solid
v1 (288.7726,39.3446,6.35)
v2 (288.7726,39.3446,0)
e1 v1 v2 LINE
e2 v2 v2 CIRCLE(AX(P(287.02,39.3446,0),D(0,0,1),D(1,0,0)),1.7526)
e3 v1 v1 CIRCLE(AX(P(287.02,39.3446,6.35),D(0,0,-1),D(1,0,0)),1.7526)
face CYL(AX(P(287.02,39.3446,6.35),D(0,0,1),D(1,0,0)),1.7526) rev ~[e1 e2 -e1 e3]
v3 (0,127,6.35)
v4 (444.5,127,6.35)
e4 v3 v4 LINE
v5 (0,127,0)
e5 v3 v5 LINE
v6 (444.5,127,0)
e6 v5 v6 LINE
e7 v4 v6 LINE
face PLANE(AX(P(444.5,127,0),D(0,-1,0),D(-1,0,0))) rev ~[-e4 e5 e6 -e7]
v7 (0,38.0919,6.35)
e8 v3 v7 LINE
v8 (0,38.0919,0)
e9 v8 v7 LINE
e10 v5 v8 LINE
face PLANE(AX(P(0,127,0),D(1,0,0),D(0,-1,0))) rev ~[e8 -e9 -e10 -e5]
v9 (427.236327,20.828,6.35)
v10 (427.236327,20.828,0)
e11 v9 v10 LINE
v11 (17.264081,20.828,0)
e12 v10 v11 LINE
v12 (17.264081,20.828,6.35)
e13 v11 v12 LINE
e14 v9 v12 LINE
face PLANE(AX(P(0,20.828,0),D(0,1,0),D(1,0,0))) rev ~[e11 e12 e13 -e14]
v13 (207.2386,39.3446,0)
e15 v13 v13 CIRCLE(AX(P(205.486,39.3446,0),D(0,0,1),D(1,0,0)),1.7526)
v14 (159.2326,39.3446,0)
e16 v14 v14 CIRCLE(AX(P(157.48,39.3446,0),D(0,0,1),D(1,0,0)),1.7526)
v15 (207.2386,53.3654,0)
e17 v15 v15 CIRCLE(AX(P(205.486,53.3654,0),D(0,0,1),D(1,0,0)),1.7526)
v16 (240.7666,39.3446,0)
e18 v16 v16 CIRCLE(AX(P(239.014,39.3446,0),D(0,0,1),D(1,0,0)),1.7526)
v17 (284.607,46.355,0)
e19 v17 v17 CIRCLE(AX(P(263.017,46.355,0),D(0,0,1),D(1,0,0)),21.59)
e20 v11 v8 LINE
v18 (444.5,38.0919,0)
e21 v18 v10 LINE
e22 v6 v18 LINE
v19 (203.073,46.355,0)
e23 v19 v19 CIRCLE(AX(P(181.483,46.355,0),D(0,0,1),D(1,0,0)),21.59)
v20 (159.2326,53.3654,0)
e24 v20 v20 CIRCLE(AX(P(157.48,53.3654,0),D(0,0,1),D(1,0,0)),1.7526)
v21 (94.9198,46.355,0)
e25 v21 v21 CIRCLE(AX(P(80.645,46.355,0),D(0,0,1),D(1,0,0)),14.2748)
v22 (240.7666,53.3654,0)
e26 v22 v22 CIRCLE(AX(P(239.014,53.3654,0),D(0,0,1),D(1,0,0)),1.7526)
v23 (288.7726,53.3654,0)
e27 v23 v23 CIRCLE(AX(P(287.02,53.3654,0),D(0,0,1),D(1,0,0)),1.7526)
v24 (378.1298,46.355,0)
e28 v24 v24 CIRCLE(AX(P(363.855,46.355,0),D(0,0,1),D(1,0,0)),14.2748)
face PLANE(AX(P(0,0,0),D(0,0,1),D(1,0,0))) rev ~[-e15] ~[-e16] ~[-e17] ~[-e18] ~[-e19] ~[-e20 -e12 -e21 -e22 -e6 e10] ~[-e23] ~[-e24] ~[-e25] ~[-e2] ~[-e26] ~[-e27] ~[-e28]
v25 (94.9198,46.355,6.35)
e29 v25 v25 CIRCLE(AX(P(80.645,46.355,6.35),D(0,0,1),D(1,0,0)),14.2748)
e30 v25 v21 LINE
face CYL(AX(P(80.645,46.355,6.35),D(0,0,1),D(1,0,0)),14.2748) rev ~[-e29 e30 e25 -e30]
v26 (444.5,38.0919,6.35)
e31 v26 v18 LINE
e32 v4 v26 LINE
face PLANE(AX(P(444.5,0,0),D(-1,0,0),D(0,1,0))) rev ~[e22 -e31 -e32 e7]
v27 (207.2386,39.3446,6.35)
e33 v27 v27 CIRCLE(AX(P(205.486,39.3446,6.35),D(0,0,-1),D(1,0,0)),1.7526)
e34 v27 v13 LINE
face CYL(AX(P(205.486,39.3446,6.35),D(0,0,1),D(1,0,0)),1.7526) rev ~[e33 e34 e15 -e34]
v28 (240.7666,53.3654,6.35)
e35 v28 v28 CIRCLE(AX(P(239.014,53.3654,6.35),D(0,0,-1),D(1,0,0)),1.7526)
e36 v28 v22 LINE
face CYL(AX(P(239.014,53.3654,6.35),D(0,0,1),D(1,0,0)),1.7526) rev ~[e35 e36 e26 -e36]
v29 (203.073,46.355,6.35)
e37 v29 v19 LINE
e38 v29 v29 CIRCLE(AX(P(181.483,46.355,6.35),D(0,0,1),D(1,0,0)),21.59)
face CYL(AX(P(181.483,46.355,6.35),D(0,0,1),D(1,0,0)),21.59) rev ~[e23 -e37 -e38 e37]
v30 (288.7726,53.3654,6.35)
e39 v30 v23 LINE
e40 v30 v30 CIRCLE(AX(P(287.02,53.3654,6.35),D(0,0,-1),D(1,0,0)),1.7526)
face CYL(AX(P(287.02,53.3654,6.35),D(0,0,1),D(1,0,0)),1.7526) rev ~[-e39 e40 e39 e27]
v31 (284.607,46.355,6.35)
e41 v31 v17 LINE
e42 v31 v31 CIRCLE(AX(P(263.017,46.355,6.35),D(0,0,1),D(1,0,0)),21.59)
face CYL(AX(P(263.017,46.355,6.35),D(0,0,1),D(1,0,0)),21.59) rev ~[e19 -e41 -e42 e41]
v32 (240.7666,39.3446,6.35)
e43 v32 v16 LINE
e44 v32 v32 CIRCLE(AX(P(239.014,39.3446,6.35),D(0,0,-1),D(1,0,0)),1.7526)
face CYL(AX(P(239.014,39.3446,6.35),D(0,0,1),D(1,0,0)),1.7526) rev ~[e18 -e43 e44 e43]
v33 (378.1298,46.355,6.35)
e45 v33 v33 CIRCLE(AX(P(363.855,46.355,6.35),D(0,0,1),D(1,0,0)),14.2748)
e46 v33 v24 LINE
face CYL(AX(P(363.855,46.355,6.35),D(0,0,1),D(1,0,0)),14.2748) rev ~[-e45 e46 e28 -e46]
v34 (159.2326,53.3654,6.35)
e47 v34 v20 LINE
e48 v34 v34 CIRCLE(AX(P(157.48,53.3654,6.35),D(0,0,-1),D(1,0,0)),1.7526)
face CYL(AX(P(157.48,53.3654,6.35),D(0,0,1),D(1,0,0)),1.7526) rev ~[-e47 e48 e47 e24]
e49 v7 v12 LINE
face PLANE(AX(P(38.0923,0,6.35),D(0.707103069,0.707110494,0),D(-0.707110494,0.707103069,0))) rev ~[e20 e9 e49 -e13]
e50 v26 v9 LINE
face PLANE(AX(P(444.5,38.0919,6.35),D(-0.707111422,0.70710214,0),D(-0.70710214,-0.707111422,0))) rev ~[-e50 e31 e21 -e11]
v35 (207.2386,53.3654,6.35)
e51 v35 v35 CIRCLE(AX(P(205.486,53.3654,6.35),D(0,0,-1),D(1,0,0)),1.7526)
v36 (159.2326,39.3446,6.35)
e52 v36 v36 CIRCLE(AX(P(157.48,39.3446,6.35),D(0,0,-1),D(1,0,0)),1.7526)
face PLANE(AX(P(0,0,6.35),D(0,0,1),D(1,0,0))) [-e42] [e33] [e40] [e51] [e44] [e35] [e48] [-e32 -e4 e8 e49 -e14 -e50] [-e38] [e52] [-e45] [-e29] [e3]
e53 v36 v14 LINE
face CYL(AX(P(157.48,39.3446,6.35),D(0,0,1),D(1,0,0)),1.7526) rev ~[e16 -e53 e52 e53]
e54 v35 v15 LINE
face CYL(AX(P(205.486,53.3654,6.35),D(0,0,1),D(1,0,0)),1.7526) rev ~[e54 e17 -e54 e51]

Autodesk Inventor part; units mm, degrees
ref_plane "YZ Plane" through (0, 0, 0) normal (1, 0, 0) x (0, 1, 0)
ref_plane "XZ Plane" through (0, 0, 0) normal (0, 1, 0) x (-1, 0, 0)
ref_plane "XY Plane" through (0, 0, 0) normal (0, 0, 1) x (1, 0, 0)
sketch "Sketch1" plane through (0, 0, 0) normal (0, 0, 1) x (1, 0, 0)
  line L0 (0, 0) -> (444.5, 0)
  line L1 (444.5, 0) -> (444.5, 127)
  line L2 (444.5, 127) -> (0, 127)
  line L3 (0, 127) -> (0, 0)
  dimension "d0" = 444.5
  dimension "d1" = 127
extrude "Extrusion1" add sketch "Sketch1" along normal blind 6.35
sketch "Sketch2" plane through (0, 0, 6.35) normal (0, 0, 1) x (1, 0, 0)
  line L0 (0, 0) -> (444.5, 0) projected
  line L1 (38.0923, 0) -> (0, 38.0919)
  line L2 (0, 127) -> (0, 0) projected
  line L3 (0, 0) -> (444.5, 0) projected
  line L4 (444.5, 0) -> (444.5, 127) projected
  line L5 (444.5, 0) -> (406.4, 0)
  line L6 (444.5, 0) -> (482.6, 0) construction
  line L7 (444.5, 0) -> (444.5, 38.0919)
  line L8 (444.5, 38.0919) -> (406.4086, 0)
  point P0 (419.1126, 0)
  dimension "d19" = 38.1
  dimension "d20" = 180
extrude "Extrusion2" cut sketch "Sketch2" against normal blind 50.8
sketch "Sketch3" plane through (0, 0, 6.35) normal (0, 0, 1) x (1, 0, 0)
  line L0 (0, 77.664) -> (80.645, 77.664) construction
  line L1 (444.5, 127) -> (0, 127) projected
  line L2 (80.645, 127) -> (161.29, 127) construction
  circle A0 centre (80.645, 46.355) radius 14.2748
  line L3 (444.5, 38.0919) -> (444.5, 127) projected
  line L4 (444.5, 77.664) -> (525.145, 77.664) construction
  line L5 (444.5, 38.0919) -> (444.5, 127) projected
  line L6 (444.5, 46.355) -> (525.145, 46.355) construction
  circle A1 centre (363.855, 46.355) radius 14.2748
  line L7 (444.5, 127) -> (0, 127) projected
  line L8 (0, 127) -> (0, 38.0919) projected
  circle A2 centre (181.483, 46.355) radius 21.59
  circle A3 centre (263.017, 46.355) radius 21.59
  line L9 (181.483, 46.355) -> (205.486, 46.355)
  line L10 (205.486, 46.355) -> (205.486, 53.3654)
  circle A4 centre (205.486, 53.3654) radius 1.7526
  line L11 (205.486, 46.355) -> (205.486, 39.3446)
  circle A5 centre (205.486, 39.3446) radius 1.7526
  line L12 (181.483, 46.355) -> (157.48, 46.355)
  line L13 (157.48, 46.355) -> (157.48, 53.3654)
  line L14 (157.48, 46.355) -> (157.48, 39.3446)
  circle A6 centre (157.48, 39.3446) radius 1.7526
  circle A7 centre (157.48, 53.3654) radius 1.7526
  line L15 (263.017, 46.355) -> (287.02, 46.355)
  line L16 (263.017, 46.355) -> (239.014, 46.355)
  line L17 (239.014, 46.355) -> (239.014, 53.3654)
  line L18 (239.014, 46.355) -> (239.014, 39.3446)
  line L19 (287.02, 46.355) -> (287.02, 39.3446)
  line L20 (287.02, 46.355) -> (287.02, 53.3654)
  circle A8 centre (287.02, 53.3654) radius 1.7526
  circle A9 centre (287.02, 39.3446) radius 1.7526
  circle A10 centre (239.014, 39.3446) radius 1.7526
  circle A11 centre (239.014, 53.3654) radius 1.7526
  line L21 (263.017, 46.355) -> (256.667, 46.355)
  line L22 (406.4086, 0) -> (444.5, 38.0919) projected
  line L23 (444.5, 38.0919) -> (444.5, 127) projected
  line L24 (444.5, 127) -> (0, 127) projected
  line L25 (0, 127) -> (0, 38.0919) projected
  line L26 (0, 38.0919) -> (38.0923, 0) projected
  line L27 (38.0923, 0) -> (406.4086, 0) projected
  line L28 (406.4086, 0) -> (444.5, 38.0919) projected
  line L29 (444.5, 38.0919) -> (444.5, 127) projected
  line L30 (444.5, 127) -> (0, 127) projected
  line L31 (0, 127) -> (0, 38.0919) projected
  line L32 (0, 38.0919) -> (38.0923, 0) projected
  line L33 (38.0923, 0) -> (406.4086, 0) projected
  line L34 (38.0923, 0) -> (0, 38.0919) projected
  line L35 (0, 38.0919) -> (0, 127) projected
  line L36 (0, 127) -> (444.5, 127) projected
  line L37 (444.5, 127) -> (444.5, 38.0919) projected
  line L38 (444.5, 38.0919) -> (406.4086, 0) projected
  line L39 (406.4086, 0) -> (38.0923, 0) projected
  point P0 (0, 0)
  dimension "d10" = 28.5496
  dimension "d18" = 28.5496
  dimension "d31" = 43.18
  dimension "d32" = 43.18
  dimension "d55" = 24.003
  dimension "d56" = 7.0104
  dimension "d57" = 3.5052
  dimension "d58" = 7.0104
  dimension "d59" = 3.5052
  dimension "d60" = 24.003
  dimension "d61" = 7.0104
  dimension "d62" = 7.0104
  dimension "d63" = 3.5052
  dimension "d64" = 3.5052
  dimension "d65" = 24.003
  dimension "d66" = 24.003
  dimension "d67" = 3.5052
  dimension "d68" = 3.5052
  dimension "d69" = 3.5052
  dimension "d70" = 3.5052
  dimension "d73" = 6.35
  dimension "d74" = 181.483
  dimension "d75" = 181.483
extrude "Extrusion3" cut sketch "Sketch3" against normal blind 50.8 contours A0 | A1
extrude "Extrusion4" cut sketch "Sketch3" against normal blind 25.4 contours L9 L12 A2 | A2 L12 L9 | L15 L16 A3 | A3 L16 L15
thicken "Thicken1" operation add thickness 20.828 both sides no extend neighbours yes toward (0, 1, 0) faces at (160.8644, 0, 2.1167)
extrude "Extrusion6" cut sketch "Sketch3" against normal blind 25.4 contours A4 | A5 | A6 | A7 | A8 | A9 | A10 | A11
properties part number "MecanumDriveTrainPlate17-18"
